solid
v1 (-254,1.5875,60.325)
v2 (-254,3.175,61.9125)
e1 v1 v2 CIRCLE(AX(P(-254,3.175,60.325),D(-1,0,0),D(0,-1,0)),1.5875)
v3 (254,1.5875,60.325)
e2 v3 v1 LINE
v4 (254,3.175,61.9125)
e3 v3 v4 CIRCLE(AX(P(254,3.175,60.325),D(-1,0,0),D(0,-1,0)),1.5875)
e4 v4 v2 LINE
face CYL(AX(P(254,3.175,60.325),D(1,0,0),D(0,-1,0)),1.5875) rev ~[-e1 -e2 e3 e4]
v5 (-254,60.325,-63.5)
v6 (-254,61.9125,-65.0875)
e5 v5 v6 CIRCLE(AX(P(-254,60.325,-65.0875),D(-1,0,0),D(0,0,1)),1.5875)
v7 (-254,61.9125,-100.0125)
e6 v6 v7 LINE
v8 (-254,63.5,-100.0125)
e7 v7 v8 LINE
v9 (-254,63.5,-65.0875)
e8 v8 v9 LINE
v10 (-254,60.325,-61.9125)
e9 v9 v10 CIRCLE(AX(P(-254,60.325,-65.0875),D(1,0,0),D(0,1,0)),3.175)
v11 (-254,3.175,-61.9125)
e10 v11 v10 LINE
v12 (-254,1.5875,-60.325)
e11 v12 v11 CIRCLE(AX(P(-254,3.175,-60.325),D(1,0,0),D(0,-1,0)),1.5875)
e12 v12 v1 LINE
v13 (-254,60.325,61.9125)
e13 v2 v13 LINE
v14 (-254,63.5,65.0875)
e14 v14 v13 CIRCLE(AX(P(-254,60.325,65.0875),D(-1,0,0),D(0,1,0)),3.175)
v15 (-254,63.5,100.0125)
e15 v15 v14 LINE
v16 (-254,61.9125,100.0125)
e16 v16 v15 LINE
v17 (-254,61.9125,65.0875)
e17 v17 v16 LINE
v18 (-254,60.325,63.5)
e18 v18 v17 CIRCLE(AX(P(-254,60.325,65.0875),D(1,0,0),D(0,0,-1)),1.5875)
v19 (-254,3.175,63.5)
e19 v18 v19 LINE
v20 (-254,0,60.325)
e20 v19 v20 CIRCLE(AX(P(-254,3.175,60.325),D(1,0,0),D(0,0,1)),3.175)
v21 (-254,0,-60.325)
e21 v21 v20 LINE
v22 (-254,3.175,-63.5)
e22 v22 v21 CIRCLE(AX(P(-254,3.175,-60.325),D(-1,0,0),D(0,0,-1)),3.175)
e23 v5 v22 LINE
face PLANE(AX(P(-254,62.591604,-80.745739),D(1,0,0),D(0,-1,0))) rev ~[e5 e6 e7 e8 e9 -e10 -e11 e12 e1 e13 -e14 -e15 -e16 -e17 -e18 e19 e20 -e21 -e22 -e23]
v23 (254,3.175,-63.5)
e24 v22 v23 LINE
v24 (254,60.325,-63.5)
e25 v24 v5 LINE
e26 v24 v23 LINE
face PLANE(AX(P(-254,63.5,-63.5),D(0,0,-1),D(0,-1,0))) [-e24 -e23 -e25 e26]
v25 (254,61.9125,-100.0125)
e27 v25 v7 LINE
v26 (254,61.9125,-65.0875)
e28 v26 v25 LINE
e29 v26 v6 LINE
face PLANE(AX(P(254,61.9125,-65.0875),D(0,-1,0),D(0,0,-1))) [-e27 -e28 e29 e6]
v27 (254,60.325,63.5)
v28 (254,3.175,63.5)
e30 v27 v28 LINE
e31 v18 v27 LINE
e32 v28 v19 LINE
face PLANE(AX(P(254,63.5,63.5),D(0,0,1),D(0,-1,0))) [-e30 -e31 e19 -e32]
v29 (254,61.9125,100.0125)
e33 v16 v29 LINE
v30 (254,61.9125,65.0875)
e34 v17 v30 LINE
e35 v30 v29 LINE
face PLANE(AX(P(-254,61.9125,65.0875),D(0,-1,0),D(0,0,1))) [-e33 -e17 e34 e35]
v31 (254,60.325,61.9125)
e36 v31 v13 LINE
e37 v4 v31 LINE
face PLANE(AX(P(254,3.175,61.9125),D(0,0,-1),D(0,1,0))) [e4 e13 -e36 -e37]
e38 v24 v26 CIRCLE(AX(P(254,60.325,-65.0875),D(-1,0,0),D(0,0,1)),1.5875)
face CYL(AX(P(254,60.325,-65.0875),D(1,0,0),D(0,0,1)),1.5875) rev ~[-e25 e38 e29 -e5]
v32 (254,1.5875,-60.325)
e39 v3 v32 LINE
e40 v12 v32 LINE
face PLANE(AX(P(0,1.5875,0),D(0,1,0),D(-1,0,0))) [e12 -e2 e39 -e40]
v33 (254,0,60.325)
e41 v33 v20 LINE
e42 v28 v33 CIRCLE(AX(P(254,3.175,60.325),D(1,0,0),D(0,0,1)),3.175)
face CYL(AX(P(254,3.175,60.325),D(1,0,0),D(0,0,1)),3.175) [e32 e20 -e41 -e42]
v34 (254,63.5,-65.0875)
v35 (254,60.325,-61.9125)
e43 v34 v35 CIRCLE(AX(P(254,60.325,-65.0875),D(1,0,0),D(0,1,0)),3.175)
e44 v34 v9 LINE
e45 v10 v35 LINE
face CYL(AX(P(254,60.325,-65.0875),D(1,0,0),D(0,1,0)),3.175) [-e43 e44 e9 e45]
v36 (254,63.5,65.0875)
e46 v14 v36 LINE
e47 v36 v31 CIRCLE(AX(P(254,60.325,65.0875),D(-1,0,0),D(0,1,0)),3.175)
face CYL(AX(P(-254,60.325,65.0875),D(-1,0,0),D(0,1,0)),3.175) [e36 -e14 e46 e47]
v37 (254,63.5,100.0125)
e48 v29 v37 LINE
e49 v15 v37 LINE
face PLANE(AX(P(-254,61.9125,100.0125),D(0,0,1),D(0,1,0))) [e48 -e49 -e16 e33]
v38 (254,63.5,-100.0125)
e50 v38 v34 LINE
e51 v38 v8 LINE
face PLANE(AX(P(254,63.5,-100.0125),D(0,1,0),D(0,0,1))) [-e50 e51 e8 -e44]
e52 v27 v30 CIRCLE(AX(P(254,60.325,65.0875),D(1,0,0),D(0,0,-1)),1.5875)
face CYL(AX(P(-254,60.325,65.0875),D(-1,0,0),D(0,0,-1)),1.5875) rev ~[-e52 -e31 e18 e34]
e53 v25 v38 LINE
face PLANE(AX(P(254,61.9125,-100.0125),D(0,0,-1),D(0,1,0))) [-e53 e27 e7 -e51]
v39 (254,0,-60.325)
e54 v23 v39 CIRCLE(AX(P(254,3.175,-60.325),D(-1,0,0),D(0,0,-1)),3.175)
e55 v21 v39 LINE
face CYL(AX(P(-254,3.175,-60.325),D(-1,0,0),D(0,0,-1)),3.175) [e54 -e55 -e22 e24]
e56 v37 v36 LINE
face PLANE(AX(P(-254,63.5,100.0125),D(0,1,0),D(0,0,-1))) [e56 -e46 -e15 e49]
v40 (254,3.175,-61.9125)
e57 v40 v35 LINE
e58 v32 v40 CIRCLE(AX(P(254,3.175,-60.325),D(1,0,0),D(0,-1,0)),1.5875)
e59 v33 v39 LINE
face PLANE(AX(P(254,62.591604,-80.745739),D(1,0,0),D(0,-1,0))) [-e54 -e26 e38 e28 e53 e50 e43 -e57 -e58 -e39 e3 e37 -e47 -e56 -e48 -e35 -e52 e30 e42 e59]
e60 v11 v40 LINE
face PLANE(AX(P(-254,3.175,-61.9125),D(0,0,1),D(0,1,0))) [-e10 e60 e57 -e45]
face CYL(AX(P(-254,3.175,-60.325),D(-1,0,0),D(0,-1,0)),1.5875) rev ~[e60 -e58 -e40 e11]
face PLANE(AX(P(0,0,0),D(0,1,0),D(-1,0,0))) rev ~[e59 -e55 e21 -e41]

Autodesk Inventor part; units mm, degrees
ref_plane "YZ Plane" through (0, 0, 0) normal (1, 0, 0) x (0, 1, 0)
ref_plane "XZ Plane" through (0, 0, 0) normal (0, 1, 0) x (-1, 0, 0)
ref_plane "XY Plane" through (0, 0, 0) normal (0, 0, 1) x (1, 0, 0)
sketch "Sketch1" plane through (0, 0, 0) normal (0, 1, 0) x (-1, 0, 0)
  line L0 (254, 63.5) -> (-254, 63.5)
  line L1 (-254, 63.5) -> (-254, -63.5)
  line L2 (-254, -63.5) -> (254, -63.5)
  line L3 (254, -63.5) -> (254, 63.5)
  line L4 (254, 63.5) -> (-254, -63.5) construction
  line L5 (-254, 63.5) -> (254, -63.5) construction
  point P0 (0, 0)
  dimension "d0" = 508
  dimension "d1" = 127
extrude "Extrusion1" add sketch "Sketch1" along normal blind 1.5875
sketch "Sketch2" plane through (254, 0, 61.9125) normal (0, 0, 1) x (1, 0, 0)
  line L0 (-508, 0) -> (0, 0)
  line L1 (0, 0) -> (0, 63.5)
  line L2 (0, 63.5) -> (-508, 63.5)
  line L3 (-508, 63.5) -> (-508, 0)
edge flange "Flange1" height 63.5 angle 90 thickness 1.5875 bend radius 1.5875 thickness toward (0, 0, 1) relief straight relief width 1.5875 relief depth 0.7937 edges at (0, 1.5875, 63.5) wall of the first edge with corners at (-254, 0, 61.9125) (254, 0, 61.9125) (254, 63.5, 61.9125) (-254, 63.5, 61.9125)
bend "Bend1"
corner "Corner1"
sketch "Sketch3" plane through (-254, 61.9125, 61.9125) normal (0, 1, 0) x (-1, 0, 0)
  line L0 (-508, 0) -> (0, 0)
  line L1 (0, 0) -> (0, 38.1)
  line L2 (0, 38.1) -> (-508, 38.1)
  line L3 (-508, 38.1) -> (-508, 0)
edge flange "Flange2" height 38.1 angle 90 thickness 1.5875 bend radius 1.5875 thickness toward (0, 1, 0) relief straight relief width 1.5875 relief depth 0.7937 edges at (0, 63.5, 63.5) wall of the first edge with corners at (254, 61.9125, 61.9125) (-254, 61.9125, 61.9125) (-254, 61.9125, 100.0125) (254, 61.9125, 100.0125)
bend "Bend2"
corner "Corner2"
sketch "Sketch4" plane through (-254, 0, -61.9125) normal (0, 0, -1) x (-1, 0, 0)
  line L0 (-508, 0) -> (0, 0)
  line L1 (0, 0) -> (0, 63.5)
  line L2 (0, 63.5) -> (-508, 63.5)
  line L3 (-508, 63.5) -> (-508, 0)
edge flange "Flange3" height 63.5 angle 90 thickness 1.5875 bend radius 1.5875 thickness toward (0, 0, -1) relief straight relief width 1.5875 relief depth 0.7937 edges at (0, 1.5875, -63.5) wall of the first edge with corners at (254, 0, -61.9125) (-254, 0, -61.9125) (-254, 63.5, -61.9125) (254, 63.5, -61.9125)
bend "Bend3"
corner "Corner3"
sketch "Sketch5" plane through (254, 61.9125, -61.9125) normal (0, 1, 0) x (-1, 0, 0)
  line L0 (508, 0) -> (0, 0)
  line L1 (0, 0) -> (0, -38.1)
  line L2 (0, -38.1) -> (508, -38.1)
  line L3 (508, -38.1) -> (508, 0)
edge flange "Flange4" height 38.1 angle 90 thickness 1.5875 bend radius 1.5875 thickness toward (0, 1, 0) relief straight relief width 1.5875 relief depth 0.7937 edges at (0, 63.5, -63.5) wall of the first edge with corners at (-254, 61.9125, -61.9125) (254, 61.9125, -61.9125) (254, 61.9125, -100.0125) (-254, 61.9125, -100.0125)
bend "Bend4"
corner "Corner4"
equation "\"d4\" = Thickness"
equation "\"d5\" = BendReliefWidth"
equation "\"d6\" = BendReliefDepth"
equation "\"d7\" = MinimumRemnant"
equation "\"d8\" = TransitionRadius"
equation "\"d11\" = BendRadius"
equation "\"d12\" = CornerReliefSize"
equation "\"d13\" = GapSize"
equation "\"d14\" = JacobiRadiusSize"
equation "\"d15\" = BendReliefWidth"
equation "\"d16\" = BendReliefDepth"
equation "\"d17\" = MinimumRemnant"
equation "\"d18\" = TransitionRadius"
equation "\"d21\" = BendRadius"
equation "\"d22\" = CornerReliefSize"
equation "\"d23\" = GapSize"
equation "\"d24\" = JacobiRadiusSize"
equation "\"d25\" = BendReliefWidth"
equation "\"d26\" = BendReliefDepth"
equation "\"d27\" = MinimumRemnant"
equation "\"d28\" = TransitionRadius"
equation "\"d31\" = BendRadius"
equation "\"d32\" = CornerReliefSize"
equation "\"d33\" = GapSize"
equation "\"d34\" = JacobiRadiusSize"
equation "\"d35\" = BendReliefWidth"
equation "\"d36\" = BendReliefDepth"
equation "\"d37\" = MinimumRemnant"
equation "\"d38\" = TransitionRadius"
equation "\"d41\" = BendRadius"
equation "\"d42\" = CornerReliefSize"
equation "\"d43\" = GapSize"
equation "\"d44\" = JacobiRadiusSize"
equation "\"BendRadius\" = Thickness"
equation "\"BendReliefWidth\" = Thickness"
equation "\"BendReliefDepth\" = 0.5 * Thickness"
equation "\"CornerReliefSize\" = 4 * Thickness"
equation "\"MinimumRemnant\" = 2 * Thickness"
equation "\"TransitionRadius\" = BendRadius"
equation "\"JacobiRadiusSize\" = Thickness"
equation "\"GapSize\" = Thickness"
equation "\"Thickness\" = 1.5875"
properties part number "Cubby Sheet Metal" material "Steel, Mild"
